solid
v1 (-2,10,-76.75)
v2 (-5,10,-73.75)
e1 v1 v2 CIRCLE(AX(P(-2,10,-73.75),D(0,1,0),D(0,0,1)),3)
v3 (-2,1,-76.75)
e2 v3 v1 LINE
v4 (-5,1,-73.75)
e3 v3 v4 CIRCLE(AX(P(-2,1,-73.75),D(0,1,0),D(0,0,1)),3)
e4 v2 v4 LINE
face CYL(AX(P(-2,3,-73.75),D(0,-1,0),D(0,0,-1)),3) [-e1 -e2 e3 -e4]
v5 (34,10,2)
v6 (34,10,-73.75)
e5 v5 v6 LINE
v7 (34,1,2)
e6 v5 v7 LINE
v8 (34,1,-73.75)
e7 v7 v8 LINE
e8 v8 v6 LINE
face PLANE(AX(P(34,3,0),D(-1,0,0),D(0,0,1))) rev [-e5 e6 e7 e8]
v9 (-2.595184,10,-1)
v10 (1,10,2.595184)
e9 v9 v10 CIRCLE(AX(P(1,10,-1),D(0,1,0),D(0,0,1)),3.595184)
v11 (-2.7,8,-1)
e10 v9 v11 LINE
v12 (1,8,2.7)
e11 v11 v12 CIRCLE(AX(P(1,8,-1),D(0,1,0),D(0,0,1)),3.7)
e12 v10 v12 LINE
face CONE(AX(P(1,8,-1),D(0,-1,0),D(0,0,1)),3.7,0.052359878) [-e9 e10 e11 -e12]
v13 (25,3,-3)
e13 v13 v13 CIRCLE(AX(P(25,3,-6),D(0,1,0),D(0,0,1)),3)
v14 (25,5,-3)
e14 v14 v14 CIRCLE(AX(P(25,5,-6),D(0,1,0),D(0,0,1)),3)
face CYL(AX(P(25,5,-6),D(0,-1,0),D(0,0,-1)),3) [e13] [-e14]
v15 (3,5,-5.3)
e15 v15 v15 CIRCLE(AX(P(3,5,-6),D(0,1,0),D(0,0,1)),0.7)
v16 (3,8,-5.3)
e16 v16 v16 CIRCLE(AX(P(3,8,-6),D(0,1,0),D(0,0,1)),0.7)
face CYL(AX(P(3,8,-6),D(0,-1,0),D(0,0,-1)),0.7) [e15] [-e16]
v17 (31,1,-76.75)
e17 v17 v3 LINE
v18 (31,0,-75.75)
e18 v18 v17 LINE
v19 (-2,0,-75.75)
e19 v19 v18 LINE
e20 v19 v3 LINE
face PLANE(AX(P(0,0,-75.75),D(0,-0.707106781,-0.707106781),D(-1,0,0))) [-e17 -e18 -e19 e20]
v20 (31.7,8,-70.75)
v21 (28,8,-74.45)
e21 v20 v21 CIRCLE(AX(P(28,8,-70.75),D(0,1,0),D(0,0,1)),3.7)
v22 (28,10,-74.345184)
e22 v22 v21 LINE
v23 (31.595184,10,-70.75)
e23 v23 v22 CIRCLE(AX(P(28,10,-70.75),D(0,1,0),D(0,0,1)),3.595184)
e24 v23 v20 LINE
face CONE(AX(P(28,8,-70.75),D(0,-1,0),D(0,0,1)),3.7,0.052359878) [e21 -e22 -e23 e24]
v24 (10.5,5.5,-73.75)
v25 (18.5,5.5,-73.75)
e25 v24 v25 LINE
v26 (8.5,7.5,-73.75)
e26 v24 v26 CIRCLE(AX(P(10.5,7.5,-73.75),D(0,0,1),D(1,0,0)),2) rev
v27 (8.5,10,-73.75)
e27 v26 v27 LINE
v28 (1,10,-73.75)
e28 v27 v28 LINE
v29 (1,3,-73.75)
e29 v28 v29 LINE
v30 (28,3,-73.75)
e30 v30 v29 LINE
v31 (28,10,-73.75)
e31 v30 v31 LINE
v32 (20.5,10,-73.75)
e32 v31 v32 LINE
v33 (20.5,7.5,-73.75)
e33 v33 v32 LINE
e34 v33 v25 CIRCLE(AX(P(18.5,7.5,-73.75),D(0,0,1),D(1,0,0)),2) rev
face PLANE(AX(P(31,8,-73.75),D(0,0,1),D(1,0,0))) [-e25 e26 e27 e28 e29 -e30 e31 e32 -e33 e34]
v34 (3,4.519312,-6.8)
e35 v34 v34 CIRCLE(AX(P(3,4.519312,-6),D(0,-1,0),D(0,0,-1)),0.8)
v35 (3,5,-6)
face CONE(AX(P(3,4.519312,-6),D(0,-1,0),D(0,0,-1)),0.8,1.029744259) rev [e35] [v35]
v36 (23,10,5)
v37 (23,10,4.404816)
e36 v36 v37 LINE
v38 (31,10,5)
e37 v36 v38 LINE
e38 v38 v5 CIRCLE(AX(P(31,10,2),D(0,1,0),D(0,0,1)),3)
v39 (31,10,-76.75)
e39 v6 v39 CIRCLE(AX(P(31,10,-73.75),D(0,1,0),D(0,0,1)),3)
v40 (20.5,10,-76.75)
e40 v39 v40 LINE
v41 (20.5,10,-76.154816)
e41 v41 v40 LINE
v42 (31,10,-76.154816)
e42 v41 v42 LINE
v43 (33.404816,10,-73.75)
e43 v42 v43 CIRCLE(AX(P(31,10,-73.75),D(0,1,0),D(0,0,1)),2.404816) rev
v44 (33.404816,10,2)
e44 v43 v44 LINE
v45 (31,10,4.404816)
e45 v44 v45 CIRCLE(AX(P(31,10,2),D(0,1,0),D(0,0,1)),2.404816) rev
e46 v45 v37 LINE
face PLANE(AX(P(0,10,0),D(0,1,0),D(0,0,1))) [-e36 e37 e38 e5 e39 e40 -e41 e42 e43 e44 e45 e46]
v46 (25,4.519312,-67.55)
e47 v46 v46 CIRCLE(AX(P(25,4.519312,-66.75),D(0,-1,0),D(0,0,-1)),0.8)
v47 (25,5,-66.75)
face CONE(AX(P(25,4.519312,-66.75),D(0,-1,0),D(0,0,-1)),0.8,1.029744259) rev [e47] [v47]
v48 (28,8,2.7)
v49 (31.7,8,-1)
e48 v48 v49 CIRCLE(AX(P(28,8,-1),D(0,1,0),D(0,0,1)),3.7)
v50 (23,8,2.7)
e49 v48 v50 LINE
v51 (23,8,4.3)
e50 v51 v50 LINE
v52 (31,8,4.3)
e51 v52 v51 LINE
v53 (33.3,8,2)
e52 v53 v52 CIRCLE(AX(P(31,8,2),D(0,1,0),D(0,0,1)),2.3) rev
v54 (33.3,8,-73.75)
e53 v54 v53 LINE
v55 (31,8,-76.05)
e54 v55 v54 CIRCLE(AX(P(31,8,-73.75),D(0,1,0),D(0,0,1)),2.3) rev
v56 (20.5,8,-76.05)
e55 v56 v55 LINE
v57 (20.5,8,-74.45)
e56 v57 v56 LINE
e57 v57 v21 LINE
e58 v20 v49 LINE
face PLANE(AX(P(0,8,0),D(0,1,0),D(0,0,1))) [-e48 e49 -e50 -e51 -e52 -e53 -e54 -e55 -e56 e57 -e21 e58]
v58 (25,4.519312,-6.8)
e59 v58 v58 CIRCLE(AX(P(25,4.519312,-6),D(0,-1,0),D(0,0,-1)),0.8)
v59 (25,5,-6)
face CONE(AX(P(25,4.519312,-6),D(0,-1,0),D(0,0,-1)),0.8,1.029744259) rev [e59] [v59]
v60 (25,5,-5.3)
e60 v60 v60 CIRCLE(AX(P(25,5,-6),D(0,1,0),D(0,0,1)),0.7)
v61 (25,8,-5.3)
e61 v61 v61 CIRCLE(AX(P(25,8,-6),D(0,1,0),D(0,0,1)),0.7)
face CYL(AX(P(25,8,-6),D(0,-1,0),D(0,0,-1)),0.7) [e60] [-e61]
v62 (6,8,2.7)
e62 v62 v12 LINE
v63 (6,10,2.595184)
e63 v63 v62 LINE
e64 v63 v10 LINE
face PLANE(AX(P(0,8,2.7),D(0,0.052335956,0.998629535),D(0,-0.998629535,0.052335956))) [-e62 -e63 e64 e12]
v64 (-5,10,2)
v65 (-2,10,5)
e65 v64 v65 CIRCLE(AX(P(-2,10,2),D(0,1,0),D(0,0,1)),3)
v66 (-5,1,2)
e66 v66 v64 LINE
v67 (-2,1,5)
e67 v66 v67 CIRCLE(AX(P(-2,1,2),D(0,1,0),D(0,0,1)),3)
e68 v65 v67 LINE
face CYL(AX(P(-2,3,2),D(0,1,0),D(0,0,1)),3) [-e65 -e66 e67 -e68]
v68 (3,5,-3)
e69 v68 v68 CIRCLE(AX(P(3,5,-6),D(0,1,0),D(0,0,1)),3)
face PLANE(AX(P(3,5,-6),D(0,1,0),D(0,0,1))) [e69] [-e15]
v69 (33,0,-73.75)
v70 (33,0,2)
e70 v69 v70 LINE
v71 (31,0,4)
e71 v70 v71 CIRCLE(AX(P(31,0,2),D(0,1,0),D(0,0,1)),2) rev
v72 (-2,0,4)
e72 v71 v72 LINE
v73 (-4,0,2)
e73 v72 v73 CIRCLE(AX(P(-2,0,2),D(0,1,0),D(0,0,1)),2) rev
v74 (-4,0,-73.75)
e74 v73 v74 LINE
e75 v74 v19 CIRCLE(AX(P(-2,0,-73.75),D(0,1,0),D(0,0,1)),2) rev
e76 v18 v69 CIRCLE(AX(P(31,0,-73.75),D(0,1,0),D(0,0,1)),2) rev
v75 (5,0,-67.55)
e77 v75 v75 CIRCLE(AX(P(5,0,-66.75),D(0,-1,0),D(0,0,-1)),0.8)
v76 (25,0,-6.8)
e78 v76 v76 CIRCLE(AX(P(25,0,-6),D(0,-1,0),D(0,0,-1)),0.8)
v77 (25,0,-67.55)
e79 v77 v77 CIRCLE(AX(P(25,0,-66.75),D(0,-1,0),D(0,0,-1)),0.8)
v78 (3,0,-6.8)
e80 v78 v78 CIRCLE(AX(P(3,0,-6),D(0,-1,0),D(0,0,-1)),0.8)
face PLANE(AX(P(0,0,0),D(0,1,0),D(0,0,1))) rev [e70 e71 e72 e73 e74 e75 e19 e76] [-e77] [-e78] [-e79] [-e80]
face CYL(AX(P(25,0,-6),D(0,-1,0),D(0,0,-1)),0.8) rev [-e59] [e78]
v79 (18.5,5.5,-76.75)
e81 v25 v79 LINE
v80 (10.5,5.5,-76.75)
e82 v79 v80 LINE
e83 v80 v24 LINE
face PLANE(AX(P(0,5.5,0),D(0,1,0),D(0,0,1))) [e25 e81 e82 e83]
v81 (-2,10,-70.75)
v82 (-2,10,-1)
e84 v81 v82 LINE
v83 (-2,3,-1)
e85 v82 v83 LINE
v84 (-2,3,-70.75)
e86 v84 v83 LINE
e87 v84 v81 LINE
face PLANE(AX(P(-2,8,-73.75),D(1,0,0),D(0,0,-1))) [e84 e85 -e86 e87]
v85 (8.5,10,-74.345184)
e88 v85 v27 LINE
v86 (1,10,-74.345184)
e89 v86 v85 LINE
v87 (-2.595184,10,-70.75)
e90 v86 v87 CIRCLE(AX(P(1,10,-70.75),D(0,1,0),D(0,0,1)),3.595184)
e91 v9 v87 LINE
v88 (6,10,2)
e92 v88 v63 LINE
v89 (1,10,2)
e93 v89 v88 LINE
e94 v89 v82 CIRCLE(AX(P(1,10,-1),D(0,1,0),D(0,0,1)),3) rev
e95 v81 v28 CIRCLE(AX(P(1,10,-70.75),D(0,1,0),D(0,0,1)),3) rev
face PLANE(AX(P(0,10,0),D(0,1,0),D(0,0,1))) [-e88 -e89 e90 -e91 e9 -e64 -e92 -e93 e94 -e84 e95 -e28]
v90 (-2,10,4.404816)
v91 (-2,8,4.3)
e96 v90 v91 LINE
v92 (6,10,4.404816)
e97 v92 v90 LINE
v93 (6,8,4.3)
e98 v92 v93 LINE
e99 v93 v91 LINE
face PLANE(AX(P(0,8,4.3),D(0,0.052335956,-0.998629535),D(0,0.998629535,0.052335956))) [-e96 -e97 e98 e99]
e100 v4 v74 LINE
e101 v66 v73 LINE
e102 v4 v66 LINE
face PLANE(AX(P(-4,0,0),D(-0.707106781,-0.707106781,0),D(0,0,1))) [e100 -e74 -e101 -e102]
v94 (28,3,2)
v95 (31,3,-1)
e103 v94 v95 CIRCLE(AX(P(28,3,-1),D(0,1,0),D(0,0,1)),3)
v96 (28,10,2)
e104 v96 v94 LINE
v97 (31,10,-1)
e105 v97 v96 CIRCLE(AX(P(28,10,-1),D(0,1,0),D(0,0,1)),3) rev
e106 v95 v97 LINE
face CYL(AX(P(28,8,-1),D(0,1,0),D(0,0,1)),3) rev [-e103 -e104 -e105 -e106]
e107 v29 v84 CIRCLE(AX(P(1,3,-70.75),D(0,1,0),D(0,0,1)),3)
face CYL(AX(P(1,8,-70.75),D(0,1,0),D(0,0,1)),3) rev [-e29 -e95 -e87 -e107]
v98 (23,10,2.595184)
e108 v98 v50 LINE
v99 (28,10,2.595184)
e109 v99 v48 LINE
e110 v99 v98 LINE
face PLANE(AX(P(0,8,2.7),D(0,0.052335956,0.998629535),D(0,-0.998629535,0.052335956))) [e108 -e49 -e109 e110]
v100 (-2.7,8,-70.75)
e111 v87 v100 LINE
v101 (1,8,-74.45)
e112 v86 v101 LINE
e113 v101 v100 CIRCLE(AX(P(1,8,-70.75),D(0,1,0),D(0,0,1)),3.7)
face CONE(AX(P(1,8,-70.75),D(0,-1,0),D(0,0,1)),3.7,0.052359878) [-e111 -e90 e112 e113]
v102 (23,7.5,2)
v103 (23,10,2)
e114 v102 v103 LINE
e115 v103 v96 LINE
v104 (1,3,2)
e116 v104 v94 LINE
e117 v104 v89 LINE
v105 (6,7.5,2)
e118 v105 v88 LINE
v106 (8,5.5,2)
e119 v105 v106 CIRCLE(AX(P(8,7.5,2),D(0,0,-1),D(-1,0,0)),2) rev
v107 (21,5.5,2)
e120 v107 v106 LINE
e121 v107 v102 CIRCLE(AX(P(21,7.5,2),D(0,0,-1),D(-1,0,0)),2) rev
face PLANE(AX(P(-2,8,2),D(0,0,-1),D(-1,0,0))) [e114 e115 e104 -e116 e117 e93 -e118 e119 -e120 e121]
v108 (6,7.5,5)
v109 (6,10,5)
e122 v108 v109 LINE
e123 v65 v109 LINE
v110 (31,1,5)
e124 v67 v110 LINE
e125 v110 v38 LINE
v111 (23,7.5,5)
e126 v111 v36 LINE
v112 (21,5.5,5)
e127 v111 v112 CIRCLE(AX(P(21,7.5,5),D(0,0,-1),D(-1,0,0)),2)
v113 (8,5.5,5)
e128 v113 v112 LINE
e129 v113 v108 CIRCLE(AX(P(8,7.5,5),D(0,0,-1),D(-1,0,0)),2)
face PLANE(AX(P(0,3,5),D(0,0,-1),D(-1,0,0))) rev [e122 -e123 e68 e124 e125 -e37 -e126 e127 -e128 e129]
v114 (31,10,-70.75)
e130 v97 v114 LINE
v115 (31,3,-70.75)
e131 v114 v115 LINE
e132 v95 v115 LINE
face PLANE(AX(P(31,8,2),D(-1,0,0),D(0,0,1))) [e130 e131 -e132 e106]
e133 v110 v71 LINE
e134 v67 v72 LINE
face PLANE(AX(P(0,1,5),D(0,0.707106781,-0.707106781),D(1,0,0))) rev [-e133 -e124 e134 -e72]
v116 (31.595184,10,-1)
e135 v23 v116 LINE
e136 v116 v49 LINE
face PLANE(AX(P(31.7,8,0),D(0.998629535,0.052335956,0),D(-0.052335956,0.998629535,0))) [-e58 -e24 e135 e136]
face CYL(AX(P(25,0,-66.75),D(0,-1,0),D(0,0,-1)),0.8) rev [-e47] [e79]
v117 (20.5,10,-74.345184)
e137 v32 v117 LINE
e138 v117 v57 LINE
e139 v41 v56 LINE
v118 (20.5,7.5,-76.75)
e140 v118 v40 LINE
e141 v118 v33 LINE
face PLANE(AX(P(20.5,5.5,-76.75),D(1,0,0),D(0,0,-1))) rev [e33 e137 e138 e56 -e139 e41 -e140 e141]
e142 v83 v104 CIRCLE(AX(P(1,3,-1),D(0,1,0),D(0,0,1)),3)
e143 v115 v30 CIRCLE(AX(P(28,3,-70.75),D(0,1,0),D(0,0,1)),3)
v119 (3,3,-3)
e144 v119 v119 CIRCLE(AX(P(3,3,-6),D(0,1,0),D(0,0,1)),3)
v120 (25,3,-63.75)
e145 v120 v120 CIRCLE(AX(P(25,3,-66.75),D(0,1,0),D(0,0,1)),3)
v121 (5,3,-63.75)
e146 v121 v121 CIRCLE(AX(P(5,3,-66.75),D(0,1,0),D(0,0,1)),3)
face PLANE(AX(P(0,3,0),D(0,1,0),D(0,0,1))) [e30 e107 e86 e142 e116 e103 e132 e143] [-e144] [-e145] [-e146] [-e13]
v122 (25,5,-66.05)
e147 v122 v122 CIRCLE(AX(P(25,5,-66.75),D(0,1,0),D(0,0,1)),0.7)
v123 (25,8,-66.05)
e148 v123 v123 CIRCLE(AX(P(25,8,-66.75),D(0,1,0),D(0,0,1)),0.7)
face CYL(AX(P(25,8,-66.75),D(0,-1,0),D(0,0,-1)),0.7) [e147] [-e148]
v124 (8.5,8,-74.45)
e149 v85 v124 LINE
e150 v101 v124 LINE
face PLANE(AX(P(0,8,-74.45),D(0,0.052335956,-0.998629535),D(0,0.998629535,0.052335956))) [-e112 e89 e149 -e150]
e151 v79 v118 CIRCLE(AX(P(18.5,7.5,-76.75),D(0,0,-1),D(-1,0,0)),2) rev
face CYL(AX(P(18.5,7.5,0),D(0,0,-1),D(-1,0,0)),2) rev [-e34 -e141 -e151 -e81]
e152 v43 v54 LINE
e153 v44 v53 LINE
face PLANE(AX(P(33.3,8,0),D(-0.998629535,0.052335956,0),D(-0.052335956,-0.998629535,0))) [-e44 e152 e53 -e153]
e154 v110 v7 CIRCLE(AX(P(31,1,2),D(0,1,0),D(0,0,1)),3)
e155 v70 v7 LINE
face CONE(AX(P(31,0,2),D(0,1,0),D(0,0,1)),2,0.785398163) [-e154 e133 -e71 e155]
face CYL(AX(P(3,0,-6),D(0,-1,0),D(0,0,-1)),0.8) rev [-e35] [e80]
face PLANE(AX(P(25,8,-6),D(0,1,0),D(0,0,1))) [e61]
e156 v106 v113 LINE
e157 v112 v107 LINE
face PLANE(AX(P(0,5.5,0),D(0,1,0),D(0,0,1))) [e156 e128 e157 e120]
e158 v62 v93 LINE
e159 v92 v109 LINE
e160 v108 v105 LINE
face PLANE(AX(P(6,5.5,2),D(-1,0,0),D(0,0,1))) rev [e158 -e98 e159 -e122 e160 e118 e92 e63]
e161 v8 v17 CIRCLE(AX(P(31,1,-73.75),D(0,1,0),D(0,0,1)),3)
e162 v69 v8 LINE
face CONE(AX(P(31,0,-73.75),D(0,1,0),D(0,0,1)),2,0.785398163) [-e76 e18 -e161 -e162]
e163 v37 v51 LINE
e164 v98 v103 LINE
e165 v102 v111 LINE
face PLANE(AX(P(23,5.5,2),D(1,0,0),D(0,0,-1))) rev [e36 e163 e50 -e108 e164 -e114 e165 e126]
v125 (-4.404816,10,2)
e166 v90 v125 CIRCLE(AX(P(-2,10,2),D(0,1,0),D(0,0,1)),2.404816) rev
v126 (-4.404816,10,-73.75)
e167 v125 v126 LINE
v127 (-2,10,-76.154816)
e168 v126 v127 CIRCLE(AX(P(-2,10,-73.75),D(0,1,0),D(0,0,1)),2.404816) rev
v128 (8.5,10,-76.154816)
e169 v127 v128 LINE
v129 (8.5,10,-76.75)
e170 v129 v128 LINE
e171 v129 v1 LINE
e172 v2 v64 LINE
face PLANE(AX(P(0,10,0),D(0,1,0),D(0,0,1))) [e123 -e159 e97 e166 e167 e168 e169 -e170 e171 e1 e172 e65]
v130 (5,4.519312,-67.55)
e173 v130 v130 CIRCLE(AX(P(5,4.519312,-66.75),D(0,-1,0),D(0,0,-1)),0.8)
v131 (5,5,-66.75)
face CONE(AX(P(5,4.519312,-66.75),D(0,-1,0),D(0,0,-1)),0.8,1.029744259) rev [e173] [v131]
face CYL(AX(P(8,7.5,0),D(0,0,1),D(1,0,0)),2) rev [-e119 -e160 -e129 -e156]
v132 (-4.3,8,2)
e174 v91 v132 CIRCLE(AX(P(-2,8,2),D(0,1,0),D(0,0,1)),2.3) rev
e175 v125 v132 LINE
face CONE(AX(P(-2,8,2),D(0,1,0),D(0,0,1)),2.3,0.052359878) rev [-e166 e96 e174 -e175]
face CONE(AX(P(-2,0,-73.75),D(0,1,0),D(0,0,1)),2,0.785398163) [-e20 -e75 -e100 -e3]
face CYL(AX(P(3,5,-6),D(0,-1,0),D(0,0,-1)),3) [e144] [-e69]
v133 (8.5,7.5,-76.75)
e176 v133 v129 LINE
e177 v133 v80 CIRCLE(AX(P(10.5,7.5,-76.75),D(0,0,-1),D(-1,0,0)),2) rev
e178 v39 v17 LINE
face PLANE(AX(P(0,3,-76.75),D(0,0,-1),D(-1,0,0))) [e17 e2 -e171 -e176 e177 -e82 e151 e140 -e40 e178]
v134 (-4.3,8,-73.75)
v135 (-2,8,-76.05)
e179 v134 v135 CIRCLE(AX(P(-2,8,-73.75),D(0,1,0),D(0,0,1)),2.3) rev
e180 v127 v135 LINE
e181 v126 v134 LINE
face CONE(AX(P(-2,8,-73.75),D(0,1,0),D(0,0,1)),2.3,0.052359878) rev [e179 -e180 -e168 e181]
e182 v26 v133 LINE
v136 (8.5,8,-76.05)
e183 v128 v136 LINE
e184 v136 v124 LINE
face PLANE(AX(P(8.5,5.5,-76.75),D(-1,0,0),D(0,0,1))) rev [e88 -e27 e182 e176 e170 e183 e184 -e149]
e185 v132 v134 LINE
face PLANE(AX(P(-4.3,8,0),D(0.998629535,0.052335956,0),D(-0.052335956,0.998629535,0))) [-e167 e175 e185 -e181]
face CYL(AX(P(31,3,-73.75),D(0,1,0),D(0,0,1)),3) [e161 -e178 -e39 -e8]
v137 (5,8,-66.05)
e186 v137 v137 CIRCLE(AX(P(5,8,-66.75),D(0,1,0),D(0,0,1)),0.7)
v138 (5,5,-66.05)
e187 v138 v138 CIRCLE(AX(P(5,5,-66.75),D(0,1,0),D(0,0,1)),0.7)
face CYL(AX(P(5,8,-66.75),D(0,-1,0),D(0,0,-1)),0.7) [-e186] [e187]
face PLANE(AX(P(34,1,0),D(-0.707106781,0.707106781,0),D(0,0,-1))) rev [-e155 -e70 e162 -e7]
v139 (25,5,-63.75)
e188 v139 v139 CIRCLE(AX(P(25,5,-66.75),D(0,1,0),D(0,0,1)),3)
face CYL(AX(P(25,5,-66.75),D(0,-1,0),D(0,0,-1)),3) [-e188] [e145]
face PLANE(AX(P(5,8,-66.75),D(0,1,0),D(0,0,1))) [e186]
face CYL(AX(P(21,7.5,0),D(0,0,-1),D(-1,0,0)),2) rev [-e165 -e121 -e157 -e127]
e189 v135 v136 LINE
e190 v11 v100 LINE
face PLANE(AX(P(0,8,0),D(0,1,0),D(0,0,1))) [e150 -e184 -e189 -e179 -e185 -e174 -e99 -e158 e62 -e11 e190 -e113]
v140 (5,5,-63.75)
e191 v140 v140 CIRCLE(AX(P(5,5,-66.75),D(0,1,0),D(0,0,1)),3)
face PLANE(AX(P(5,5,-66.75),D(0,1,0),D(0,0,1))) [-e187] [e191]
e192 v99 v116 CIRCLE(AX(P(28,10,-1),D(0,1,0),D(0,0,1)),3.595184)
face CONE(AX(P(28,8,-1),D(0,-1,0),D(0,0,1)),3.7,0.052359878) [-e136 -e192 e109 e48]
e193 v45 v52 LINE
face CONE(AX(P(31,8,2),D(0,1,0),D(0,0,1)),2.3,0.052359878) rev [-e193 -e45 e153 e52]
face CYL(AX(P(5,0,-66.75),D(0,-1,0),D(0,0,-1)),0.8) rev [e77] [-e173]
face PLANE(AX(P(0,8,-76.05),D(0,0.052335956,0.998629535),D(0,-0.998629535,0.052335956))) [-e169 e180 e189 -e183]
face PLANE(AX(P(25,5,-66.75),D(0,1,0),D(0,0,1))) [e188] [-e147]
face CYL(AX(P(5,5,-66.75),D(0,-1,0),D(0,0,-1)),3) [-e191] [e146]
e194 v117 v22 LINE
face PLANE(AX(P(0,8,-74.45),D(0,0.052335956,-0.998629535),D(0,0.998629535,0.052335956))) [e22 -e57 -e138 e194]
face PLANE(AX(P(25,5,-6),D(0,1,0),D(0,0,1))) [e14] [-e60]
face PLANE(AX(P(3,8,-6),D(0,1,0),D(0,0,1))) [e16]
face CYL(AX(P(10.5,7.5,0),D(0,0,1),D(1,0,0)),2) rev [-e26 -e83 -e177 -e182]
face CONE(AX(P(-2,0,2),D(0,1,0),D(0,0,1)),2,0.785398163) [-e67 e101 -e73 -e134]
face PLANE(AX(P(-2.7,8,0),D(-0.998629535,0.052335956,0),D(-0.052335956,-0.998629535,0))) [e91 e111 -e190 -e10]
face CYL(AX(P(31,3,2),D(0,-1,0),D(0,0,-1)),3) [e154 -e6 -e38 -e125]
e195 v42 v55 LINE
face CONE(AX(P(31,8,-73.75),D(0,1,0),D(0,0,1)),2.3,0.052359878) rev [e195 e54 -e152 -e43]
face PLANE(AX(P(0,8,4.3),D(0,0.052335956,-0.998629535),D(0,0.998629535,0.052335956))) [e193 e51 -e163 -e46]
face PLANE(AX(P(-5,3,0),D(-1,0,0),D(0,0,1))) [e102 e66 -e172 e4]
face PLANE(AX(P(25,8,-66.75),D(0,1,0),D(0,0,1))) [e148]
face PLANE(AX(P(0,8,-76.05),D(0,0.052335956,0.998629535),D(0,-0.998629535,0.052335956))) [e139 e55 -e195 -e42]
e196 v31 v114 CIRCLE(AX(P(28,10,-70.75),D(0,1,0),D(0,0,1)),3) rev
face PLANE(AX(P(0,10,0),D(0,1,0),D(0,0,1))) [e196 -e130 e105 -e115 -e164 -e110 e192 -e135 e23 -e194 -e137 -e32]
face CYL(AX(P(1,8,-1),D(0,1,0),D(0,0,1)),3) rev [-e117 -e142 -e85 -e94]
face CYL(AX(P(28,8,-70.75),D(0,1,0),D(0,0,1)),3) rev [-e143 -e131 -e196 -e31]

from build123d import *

# Parameters (mm, degrees)
SKETCH1_W                       = 39
SKETCH1_H                       = 81.75
SKETCH1_R                       = 3
BOSS_EXTRUDE1_DEPTH             = 3
SKETCH3_W                       = 39
SKETCH3_H                       = 81.75
SKETCH3_W_2                     = 33
SKETCH3_H_2                     = 75.75
BOSS_EXTRUDE3_DEPTH             = 5
BOSS_EXTRUDE4_START             = 3
SKETCH1_3_R                     = 3
BOSS_EXTRUDE4_DEPTH             = 2
SKETCH8_R                       = 0.7
BOARD_MOUNTING_STANDOFFS_DEPTH  = 3
TAP_DRILL_FOR_M2X0_4_TAP1_D     = 1.6
TAP_DRILL_FOR_M2X0_4_TAP1_DEPTH = 4.519311505
TAP_DRILL_FOR_M2X0_4_TAP1_TIP   = 0.480688495
FILLET2_R                       = 3
SKETCH6_W                       = 12
SKETCH6_H                       = 3
SKETCH6_W_2                     = 17
CUT_EXTRUDE1_DEPTH              = 2.5
STANDOFFS1_LIP_START            = 8
STANDOFFS1_LIP_DEPTH            = 2
STANDOFFS2_LIP_START            = 8
STANDOFFS2_LIP_DEPTH            = 2
FILLET4_R                       = 2
CHAMFER1_SIZE                   = 1


with BuildPart() as part:
    # Sketch1 → Boss-Extrude1 (new body)
    # profile 1 of 5: a face of its own
    with BuildSketch(Plane(origin=(0, 0, 0), x_dir=(1, 0, 0), z_dir=(0, 1, 0))):
        with Locations((14.5, 35.875)):
            Rectangle(SKETCH1_W, SKETCH1_H)
        with Locations((3, 6)):
            Circle(SKETCH1_R, mode=Mode.SUBTRACT)
        with Locations((25, 6)):
            Circle(SKETCH1_R, mode=Mode.SUBTRACT)
        with Locations((5, 66.75)):
            Circle(SKETCH1_R, mode=Mode.SUBTRACT)
        with Locations((25, 66.75)):
            Circle(SKETCH1_R, mode=Mode.SUBTRACT)
    # profile 2 of 5: a face of its own
    with BuildSketch(Plane(origin=(0, 0, 0), x_dir=(1, 0, 0), z_dir=(0, 1, 0))):
        with Locations((5, 66.75)):
            Circle(SKETCH1_R)
    # profile 3 of 5: a face of its own
    with BuildSketch(Plane(origin=(0, 0, 0), x_dir=(1, 0, 0), z_dir=(0, 1, 0))):
        with Locations((25, 66.75)):
            Circle(SKETCH1_R)
    # profile 4 of 5: a face of its own
    with BuildSketch(Plane(origin=(0, 0, 0), x_dir=(1, 0, 0), z_dir=(0, 1, 0))):
        with Locations((25, 6)):
            Circle(SKETCH1_R)
    # profile 5 of 5: a face of its own
    with BuildSketch(Plane(origin=(0, 0, 0), x_dir=(1, 0, 0), z_dir=(0, 1, 0))):
        with Locations((3, 6)):
            Circle(SKETCH1_R)
    extrude(amount=BOSS_EXTRUDE1_DEPTH)

    # Sketch3 → Boss-Extrude3 (add)
    with BuildSketch(Plane(origin=(0, 3, 0), x_dir=(1, 0, 0), z_dir=(0, 1, 0))):
        with Locations((14.5, 35.875)):
            Rectangle(SKETCH3_W, SKETCH3_H)
        with Locations((14.5, 35.875)):
            Rectangle(SKETCH3_W_2, SKETCH3_H_2, mode=Mode.SUBTRACT)
    extrude(amount=BOSS_EXTRUDE3_DEPTH)

    # Sketch1<3> → Boss-Extrude4 (add)
    with BuildSketch(Plane(origin=(0, 0, 0), x_dir=(1, 0, 0), z_dir=(0, 1, 0)).offset(BOSS_EXTRUDE4_START)):
        with Locations(Location((3, 6, 0), (0, 0, 270))):
            Circle(SKETCH1_3_R)
        with Locations(Location((25, 6, 0), (0, 0, 270))):
            Circle(SKETCH1_3_R)
        with Locations(Location((25, 66.75, 0), (0, 0, 270))):
            Circle(SKETCH1_3_R)
        with Locations(Location((5, 66.75, 0), (0, 0, 270))):
            Circle(SKETCH1_3_R)
    extrude(amount=BOSS_EXTRUDE4_DEPTH)

    # Sketch8 → Board Mounting Standoffs (add)
    with BuildSketch(Plane(origin=(0, 5, 0), x_dir=(1, 0, 0), z_dir=(0, 1, 0))):
        with Locations(Location((5, 66.75, 0), (0, 0, 270))):
            Circle(SKETCH8_R)
        with Locations(Location((25, 66.75, 0), (0, 0, 270))):
            Circle(SKETCH8_R)
        with Locations(Location((3, 6, 0), (0, 0, 270))):
            Circle(SKETCH8_R)
        with Locations(Location((25, 6, 0), (0, 0, 270))):
            Circle(SKETCH8_R)
    extrude(amount=BOARD_MOUNTING_STANDOFFS_DEPTH)

    # Tap Drill for M2x0.4 Tap1
    with Locations(Plane(origin=(0, 0, 0), x_dir=(-1, 0, 0), z_dir=(0, -1, 0))):
        with Locations((-25, 66.75), (-5, 66.75), (-25, 6), (-3, 6)):
            Hole(TAP_DRILL_FOR_M2X0_4_TAP1_D / 2, depth=TAP_DRILL_FOR_M2X0_4_TAP1_DEPTH)
            with Locations((0, 0, -(TAP_DRILL_FOR_M2X0_4_TAP1_DEPTH + TAP_DRILL_FOR_M2X0_4_TAP1_TIP / 2))):  # 118° drill point
                Cone(0, TAP_DRILL_FOR_M2X0_4_TAP1_D / 2, TAP_DRILL_FOR_M2X0_4_TAP1_TIP, mode=Mode.SUBTRACT)

    # Fillet2
    fillet2_edges = [part.edges().sort_by_distance(p)[0] for p in [
        (-2, 5.5, -73.75),
        (-2, 5.5, 2),
        (31, 5.5, 2),
        (31, 5.5, -73.75),
        (-5, 4, -76.75),
        (34, 4, -76.75),
        (34, 4, 5),
        (-5, 4, 5),
    ]]
    fillet(fillet2_edges, radius=FILLET2_R)

    # Sketch6 → Cut-Extrude1 (cut)
    with BuildSketch(Plane(origin=(0, 8, 0), x_dir=(1, 0, 0), z_dir=(0, 1, 0))):
        with Locations((14.5, 75.25)):
            Rectangle(SKETCH6_W, SKETCH6_H)
        with Locations((14.5, -3.5)):
            Rectangle(SKETCH6_W_2, SKETCH6_H)
    extrude(amount=-CUT_EXTRUDE1_DEPTH, mode=Mode.SUBTRACT)

    # Standoffs1-Lip: read off the stored shape, not the designer's step
    # Standoffs1-Lip outline → Standoffs1-Lip (add)
    with BuildSketch(Plane(origin=(0, 0, 0), x_dir=(1, 0, 0), z_dir=(0, 1, 0)).offset(STANDOFFS1_LIP_START)):
        with BuildLine():
            Line((23, -5), (31, -5))
            ThreePointArc((31, -5), (33.121320344, -4.121320344), (34, -2))
            Line((34, -2), (34, 73.75))
            ThreePointArc((34, 73.75), (33.121320344, 75.871320344), (31, 76.75))
            Line((31, 76.75), (20.5, 76.75))
            Line((20.5, 76.75), (20.5, 73.75))
            Line((20.5, 73.75), (28, 73.75))
            ThreePointArc((28, 73.75), (30.121320344, 72.871320344), (31, 70.75))
            Line((31, 70.75), (31, 1))
            ThreePointArc((31, 1), (30.121320344, -1.121320344), (28, -2))
            Line((28, -2), (23, -2))
            Line((23, -2), (23, -5))
        make_face()
    extrude(amount=STANDOFFS1_LIP_DEPTH)

    # Standoffs1-Lip 2: loft between two sections, ruled curve by curve
    standoffs1_lip_2_from = [
        Edge.make_three_point_arc((33.3, 8, -73.75), (32.626345597, 8, -75.376345597), (31, 8, -76.05)),
        Edge.make_three_point_arc((31, 8, 4.3), (32.626345597, 8, 3.626345597), (33.3, 8, 2)),
        Edge.make_three_point_arc((31.7, 8, -1), (30.61629509, 8, 1.61629509), (28, 8, 2.7)),
        Edge.make_three_point_arc((28, 8, -74.45), (30.61629509, 8, -73.36629509), (31.7, 8, -70.75)),
        Edge.make_line((20.5, 8, -76.05), (31, 8, -76.05)),
        Edge.make_line((33.3, 8, -73.75), (33.3, 8, 2)),
        Edge.make_line((31, 8, 4.3), (23, 8, 4.3)),
        Edge.make_line((20.5, 8, -74.45), (28, 8, -74.45)),
        Edge.make_line((28, 8, 2.7), (23, 8, 2.7)),
        Edge.make_line((31.7, 8, -70.75), (31.7, 8, -1)),
        Edge.make_line((20.5, 8, -74.45), (20.5, 8, -76.05)),
        Edge.make_line((23, 8, 2.7), (23, 8, 4.3)),
    ]
    standoffs1_lip_2_to = [
        Edge.make_three_point_arc((33.404815559, 10, -73.75), (32.700461389, 10, -75.450461389), (31, 10, -76.154815559)),
        Edge.make_three_point_arc((31, 10, 4.404815559), (32.700461389, 10, 3.700461389), (33.404815559, 10, 2)),
        Edge.make_three_point_arc((31.595184441, 10, -1), (30.542179298, 10, 1.542179298), (28, 10, 2.595184441)),
        Edge.make_three_point_arc((28, 10, -74.345184441), (30.542179298, 10, -73.292179298), (31.595184441, 10, -70.75)),
        Edge.make_line((20.5, 10, -76.154815559), (31, 10, -76.154815559)),
        Edge.make_line((33.404815559, 10, -73.75), (33.404815559, 10, 2)),
        Edge.make_line((31, 10, 4.404815559), (23, 10, 4.404815559)),
        Edge.make_line((20.5, 10, -74.345184441), (28, 10, -74.345184441)),
        Edge.make_line((28, 10, 2.595184441), (23, 10, 2.595184441)),
        Edge.make_line((31.595184441, 10, -70.75), (31.595184441, 10, -1)),
        Edge.make_line((20.5, 10, -74.345184441), (20.5, 10, -76.154815559)),
        Edge.make_line((23, 10, 2.595184441), (23, 10, 4.404815559)),
    ]
    standoffs1_lip_2 = Solid(Shell([*[Face.make_surface_from_curves(standoffs1_lip_2_from[k], standoffs1_lip_2_to[k]) for k in range(12)], Face(Wire(standoffs1_lip_2_from)), Face(Wire(standoffs1_lip_2_to))]))
    add(standoffs1_lip_2, mode=Mode.SUBTRACT)

    # Standoffs2-Lip: read off the stored shape, not the designer's step
    # Standoffs2-Lip outline → Standoffs2-Lip (add)
    with BuildSketch(Plane(origin=(0, 0, 0), x_dir=(1, 0, 0), z_dir=(0, 1, 0)).offset(STANDOFFS2_LIP_START)):
        with BuildLine():
            ThreePointArc((-2, 76.75), (-4.121320344, 75.871320344), (-5, 73.75))
            Line((-5, 73.75), (-5, -2))
            ThreePointArc((-5, -2), (-4.121320344, -4.121320344), (-2, -5))
            Line((-2, -5), (6, -5))
            Line((6, -5), (6, -2))
            Line((6, -2), (1, -2))
            ThreePointArc((1, -2), (-1.121320344, -1.121320344), (-2, 1))
            Line((-2, 1), (-2, 70.75))
            ThreePointArc((-2, 70.75), (-1.121320344, 72.871320344), (1, 73.75))
            Line((1, 73.75), (8.5, 73.75))
            Line((8.5, 73.75), (8.5, 76.75))
            Line((8.5, 76.75), (-2, 76.75))
        make_face()
    extrude(amount=STANDOFFS2_LIP_DEPTH)

    # Standoffs2-Lip 2: loft between two sections, ruled curve by curve
    standoffs2_lip_2_from = [
        Edge.make_three_point_arc((-4.3, 8, 2), (-3.626345597, 8, 3.626345597), (-2, 8, 4.3)),
        Edge.make_three_point_arc((-2, 8, -76.05), (-3.626345597, 8, -75.376345597), (-4.3, 8, -73.75)),
        Edge.make_three_point_arc((-2.7, 8, -70.75), (-1.61629509, 8, -73.36629509), (1, 8, -74.45)),
        Edge.make_three_point_arc((1, 8, 2.7), (-1.61629509, 8, 1.61629509), (-2.7, 8, -1)),
        Edge.make_line((-2, 8, -76.05), (8.5, 8, -76.05)),
        Edge.make_line((6, 8, 4.3), (-2, 8, 4.3)),
        Edge.make_line((1, 8, -74.45), (8.5, 8, -74.45)),
        Edge.make_line((6, 8, 2.7), (1, 8, 2.7)),
        Edge.make_line((-4.3, 8, 2), (-4.3, 8, -73.75)),
        Edge.make_line((-2.7, 8, -1), (-2.7, 8, -70.75)),
        Edge.make_line((8.5, 8, -74.45), (8.5, 8, -76.05)),
        Edge.make_line((6, 8, 2.7), (6, 8, 4.3)),
    ]
    standoffs2_lip_2_to = [
        Edge.make_three_point_arc((-4.404815559, 10, 2), (-3.700461389, 10, 3.700461389), (-2, 10, 4.404815559)),
        Edge.make_three_point_arc((-2, 10, -76.154815559), (-3.700461389, 10, -75.450461389), (-4.404815559, 10, -73.75)),
        Edge.make_three_point_arc((-2.595184441, 10, -70.75), (-1.542179298, 10, -73.292179298), (1, 10, -74.345184441)),
        Edge.make_three_point_arc((1, 10, 2.595184441), (-1.542179298, 10, 1.542179298), (-2.595184441, 10, -1)),
        Edge.make_line((-2, 10, -76.154815559), (8.5, 10, -76.154815559)),
        Edge.make_line((6, 10, 4.404815559), (-2, 10, 4.404815559)),
        Edge.make_line((1, 10, -74.345184441), (8.5, 10, -74.345184441)),
        Edge.make_line((6, 10, 2.595184441), (1, 10, 2.595184441)),
        Edge.make_line((-4.404815559, 10, 2), (-4.404815559, 10, -73.75)),
        Edge.make_line((-2.595184441, 10, -1), (-2.595184441, 10, -70.75)),
        Edge.make_line((8.5, 10, -74.345184441), (8.5, 10, -76.154815559)),
        Edge.make_line((6, 10, 2.595184441), (6, 10, 4.404815559)),
    ]
    standoffs2_lip_2 = Solid(Shell([*[Face.make_surface_from_curves(standoffs2_lip_2_from[k], standoffs2_lip_2_to[k]) for k in range(12)], Face(Wire(standoffs2_lip_2_from)), Face(Wire(standoffs2_lip_2_to))]))
    add(standoffs2_lip_2, mode=Mode.SUBTRACT)

    # Fillet4
    fillet4_edges = [part.edges().sort_by_distance(p)[0] for p in [
        (8.5, 5.5, -75.25),
        (20.5, 5.5, -75.25),
        (6, 5.5, 3.5),
        (23, 5.5, 3.5),
    ]]
    fillet(fillet4_edges, radius=FILLET4_R)

    # Chamfer1
    chamfer1_edges = [part.edges().sort_by_distance(p)[0] for p in [
        (34, 0, -35.875),
        (-5, 0, -35.875),
        (14.5, 0, -76.75),
        (14.5, 0, 5),
        (33.121320344, 0, -75.871320344),
        (-4.121320344, 0, -75.871320344),
        (-4.121320344, 0, 4.121320344),
        (33.121320344, 0, 4.121320344),
    ]]
    chamfer(chamfer1_edges, length=CHAMFER1_SIZE)


solid = part.part
